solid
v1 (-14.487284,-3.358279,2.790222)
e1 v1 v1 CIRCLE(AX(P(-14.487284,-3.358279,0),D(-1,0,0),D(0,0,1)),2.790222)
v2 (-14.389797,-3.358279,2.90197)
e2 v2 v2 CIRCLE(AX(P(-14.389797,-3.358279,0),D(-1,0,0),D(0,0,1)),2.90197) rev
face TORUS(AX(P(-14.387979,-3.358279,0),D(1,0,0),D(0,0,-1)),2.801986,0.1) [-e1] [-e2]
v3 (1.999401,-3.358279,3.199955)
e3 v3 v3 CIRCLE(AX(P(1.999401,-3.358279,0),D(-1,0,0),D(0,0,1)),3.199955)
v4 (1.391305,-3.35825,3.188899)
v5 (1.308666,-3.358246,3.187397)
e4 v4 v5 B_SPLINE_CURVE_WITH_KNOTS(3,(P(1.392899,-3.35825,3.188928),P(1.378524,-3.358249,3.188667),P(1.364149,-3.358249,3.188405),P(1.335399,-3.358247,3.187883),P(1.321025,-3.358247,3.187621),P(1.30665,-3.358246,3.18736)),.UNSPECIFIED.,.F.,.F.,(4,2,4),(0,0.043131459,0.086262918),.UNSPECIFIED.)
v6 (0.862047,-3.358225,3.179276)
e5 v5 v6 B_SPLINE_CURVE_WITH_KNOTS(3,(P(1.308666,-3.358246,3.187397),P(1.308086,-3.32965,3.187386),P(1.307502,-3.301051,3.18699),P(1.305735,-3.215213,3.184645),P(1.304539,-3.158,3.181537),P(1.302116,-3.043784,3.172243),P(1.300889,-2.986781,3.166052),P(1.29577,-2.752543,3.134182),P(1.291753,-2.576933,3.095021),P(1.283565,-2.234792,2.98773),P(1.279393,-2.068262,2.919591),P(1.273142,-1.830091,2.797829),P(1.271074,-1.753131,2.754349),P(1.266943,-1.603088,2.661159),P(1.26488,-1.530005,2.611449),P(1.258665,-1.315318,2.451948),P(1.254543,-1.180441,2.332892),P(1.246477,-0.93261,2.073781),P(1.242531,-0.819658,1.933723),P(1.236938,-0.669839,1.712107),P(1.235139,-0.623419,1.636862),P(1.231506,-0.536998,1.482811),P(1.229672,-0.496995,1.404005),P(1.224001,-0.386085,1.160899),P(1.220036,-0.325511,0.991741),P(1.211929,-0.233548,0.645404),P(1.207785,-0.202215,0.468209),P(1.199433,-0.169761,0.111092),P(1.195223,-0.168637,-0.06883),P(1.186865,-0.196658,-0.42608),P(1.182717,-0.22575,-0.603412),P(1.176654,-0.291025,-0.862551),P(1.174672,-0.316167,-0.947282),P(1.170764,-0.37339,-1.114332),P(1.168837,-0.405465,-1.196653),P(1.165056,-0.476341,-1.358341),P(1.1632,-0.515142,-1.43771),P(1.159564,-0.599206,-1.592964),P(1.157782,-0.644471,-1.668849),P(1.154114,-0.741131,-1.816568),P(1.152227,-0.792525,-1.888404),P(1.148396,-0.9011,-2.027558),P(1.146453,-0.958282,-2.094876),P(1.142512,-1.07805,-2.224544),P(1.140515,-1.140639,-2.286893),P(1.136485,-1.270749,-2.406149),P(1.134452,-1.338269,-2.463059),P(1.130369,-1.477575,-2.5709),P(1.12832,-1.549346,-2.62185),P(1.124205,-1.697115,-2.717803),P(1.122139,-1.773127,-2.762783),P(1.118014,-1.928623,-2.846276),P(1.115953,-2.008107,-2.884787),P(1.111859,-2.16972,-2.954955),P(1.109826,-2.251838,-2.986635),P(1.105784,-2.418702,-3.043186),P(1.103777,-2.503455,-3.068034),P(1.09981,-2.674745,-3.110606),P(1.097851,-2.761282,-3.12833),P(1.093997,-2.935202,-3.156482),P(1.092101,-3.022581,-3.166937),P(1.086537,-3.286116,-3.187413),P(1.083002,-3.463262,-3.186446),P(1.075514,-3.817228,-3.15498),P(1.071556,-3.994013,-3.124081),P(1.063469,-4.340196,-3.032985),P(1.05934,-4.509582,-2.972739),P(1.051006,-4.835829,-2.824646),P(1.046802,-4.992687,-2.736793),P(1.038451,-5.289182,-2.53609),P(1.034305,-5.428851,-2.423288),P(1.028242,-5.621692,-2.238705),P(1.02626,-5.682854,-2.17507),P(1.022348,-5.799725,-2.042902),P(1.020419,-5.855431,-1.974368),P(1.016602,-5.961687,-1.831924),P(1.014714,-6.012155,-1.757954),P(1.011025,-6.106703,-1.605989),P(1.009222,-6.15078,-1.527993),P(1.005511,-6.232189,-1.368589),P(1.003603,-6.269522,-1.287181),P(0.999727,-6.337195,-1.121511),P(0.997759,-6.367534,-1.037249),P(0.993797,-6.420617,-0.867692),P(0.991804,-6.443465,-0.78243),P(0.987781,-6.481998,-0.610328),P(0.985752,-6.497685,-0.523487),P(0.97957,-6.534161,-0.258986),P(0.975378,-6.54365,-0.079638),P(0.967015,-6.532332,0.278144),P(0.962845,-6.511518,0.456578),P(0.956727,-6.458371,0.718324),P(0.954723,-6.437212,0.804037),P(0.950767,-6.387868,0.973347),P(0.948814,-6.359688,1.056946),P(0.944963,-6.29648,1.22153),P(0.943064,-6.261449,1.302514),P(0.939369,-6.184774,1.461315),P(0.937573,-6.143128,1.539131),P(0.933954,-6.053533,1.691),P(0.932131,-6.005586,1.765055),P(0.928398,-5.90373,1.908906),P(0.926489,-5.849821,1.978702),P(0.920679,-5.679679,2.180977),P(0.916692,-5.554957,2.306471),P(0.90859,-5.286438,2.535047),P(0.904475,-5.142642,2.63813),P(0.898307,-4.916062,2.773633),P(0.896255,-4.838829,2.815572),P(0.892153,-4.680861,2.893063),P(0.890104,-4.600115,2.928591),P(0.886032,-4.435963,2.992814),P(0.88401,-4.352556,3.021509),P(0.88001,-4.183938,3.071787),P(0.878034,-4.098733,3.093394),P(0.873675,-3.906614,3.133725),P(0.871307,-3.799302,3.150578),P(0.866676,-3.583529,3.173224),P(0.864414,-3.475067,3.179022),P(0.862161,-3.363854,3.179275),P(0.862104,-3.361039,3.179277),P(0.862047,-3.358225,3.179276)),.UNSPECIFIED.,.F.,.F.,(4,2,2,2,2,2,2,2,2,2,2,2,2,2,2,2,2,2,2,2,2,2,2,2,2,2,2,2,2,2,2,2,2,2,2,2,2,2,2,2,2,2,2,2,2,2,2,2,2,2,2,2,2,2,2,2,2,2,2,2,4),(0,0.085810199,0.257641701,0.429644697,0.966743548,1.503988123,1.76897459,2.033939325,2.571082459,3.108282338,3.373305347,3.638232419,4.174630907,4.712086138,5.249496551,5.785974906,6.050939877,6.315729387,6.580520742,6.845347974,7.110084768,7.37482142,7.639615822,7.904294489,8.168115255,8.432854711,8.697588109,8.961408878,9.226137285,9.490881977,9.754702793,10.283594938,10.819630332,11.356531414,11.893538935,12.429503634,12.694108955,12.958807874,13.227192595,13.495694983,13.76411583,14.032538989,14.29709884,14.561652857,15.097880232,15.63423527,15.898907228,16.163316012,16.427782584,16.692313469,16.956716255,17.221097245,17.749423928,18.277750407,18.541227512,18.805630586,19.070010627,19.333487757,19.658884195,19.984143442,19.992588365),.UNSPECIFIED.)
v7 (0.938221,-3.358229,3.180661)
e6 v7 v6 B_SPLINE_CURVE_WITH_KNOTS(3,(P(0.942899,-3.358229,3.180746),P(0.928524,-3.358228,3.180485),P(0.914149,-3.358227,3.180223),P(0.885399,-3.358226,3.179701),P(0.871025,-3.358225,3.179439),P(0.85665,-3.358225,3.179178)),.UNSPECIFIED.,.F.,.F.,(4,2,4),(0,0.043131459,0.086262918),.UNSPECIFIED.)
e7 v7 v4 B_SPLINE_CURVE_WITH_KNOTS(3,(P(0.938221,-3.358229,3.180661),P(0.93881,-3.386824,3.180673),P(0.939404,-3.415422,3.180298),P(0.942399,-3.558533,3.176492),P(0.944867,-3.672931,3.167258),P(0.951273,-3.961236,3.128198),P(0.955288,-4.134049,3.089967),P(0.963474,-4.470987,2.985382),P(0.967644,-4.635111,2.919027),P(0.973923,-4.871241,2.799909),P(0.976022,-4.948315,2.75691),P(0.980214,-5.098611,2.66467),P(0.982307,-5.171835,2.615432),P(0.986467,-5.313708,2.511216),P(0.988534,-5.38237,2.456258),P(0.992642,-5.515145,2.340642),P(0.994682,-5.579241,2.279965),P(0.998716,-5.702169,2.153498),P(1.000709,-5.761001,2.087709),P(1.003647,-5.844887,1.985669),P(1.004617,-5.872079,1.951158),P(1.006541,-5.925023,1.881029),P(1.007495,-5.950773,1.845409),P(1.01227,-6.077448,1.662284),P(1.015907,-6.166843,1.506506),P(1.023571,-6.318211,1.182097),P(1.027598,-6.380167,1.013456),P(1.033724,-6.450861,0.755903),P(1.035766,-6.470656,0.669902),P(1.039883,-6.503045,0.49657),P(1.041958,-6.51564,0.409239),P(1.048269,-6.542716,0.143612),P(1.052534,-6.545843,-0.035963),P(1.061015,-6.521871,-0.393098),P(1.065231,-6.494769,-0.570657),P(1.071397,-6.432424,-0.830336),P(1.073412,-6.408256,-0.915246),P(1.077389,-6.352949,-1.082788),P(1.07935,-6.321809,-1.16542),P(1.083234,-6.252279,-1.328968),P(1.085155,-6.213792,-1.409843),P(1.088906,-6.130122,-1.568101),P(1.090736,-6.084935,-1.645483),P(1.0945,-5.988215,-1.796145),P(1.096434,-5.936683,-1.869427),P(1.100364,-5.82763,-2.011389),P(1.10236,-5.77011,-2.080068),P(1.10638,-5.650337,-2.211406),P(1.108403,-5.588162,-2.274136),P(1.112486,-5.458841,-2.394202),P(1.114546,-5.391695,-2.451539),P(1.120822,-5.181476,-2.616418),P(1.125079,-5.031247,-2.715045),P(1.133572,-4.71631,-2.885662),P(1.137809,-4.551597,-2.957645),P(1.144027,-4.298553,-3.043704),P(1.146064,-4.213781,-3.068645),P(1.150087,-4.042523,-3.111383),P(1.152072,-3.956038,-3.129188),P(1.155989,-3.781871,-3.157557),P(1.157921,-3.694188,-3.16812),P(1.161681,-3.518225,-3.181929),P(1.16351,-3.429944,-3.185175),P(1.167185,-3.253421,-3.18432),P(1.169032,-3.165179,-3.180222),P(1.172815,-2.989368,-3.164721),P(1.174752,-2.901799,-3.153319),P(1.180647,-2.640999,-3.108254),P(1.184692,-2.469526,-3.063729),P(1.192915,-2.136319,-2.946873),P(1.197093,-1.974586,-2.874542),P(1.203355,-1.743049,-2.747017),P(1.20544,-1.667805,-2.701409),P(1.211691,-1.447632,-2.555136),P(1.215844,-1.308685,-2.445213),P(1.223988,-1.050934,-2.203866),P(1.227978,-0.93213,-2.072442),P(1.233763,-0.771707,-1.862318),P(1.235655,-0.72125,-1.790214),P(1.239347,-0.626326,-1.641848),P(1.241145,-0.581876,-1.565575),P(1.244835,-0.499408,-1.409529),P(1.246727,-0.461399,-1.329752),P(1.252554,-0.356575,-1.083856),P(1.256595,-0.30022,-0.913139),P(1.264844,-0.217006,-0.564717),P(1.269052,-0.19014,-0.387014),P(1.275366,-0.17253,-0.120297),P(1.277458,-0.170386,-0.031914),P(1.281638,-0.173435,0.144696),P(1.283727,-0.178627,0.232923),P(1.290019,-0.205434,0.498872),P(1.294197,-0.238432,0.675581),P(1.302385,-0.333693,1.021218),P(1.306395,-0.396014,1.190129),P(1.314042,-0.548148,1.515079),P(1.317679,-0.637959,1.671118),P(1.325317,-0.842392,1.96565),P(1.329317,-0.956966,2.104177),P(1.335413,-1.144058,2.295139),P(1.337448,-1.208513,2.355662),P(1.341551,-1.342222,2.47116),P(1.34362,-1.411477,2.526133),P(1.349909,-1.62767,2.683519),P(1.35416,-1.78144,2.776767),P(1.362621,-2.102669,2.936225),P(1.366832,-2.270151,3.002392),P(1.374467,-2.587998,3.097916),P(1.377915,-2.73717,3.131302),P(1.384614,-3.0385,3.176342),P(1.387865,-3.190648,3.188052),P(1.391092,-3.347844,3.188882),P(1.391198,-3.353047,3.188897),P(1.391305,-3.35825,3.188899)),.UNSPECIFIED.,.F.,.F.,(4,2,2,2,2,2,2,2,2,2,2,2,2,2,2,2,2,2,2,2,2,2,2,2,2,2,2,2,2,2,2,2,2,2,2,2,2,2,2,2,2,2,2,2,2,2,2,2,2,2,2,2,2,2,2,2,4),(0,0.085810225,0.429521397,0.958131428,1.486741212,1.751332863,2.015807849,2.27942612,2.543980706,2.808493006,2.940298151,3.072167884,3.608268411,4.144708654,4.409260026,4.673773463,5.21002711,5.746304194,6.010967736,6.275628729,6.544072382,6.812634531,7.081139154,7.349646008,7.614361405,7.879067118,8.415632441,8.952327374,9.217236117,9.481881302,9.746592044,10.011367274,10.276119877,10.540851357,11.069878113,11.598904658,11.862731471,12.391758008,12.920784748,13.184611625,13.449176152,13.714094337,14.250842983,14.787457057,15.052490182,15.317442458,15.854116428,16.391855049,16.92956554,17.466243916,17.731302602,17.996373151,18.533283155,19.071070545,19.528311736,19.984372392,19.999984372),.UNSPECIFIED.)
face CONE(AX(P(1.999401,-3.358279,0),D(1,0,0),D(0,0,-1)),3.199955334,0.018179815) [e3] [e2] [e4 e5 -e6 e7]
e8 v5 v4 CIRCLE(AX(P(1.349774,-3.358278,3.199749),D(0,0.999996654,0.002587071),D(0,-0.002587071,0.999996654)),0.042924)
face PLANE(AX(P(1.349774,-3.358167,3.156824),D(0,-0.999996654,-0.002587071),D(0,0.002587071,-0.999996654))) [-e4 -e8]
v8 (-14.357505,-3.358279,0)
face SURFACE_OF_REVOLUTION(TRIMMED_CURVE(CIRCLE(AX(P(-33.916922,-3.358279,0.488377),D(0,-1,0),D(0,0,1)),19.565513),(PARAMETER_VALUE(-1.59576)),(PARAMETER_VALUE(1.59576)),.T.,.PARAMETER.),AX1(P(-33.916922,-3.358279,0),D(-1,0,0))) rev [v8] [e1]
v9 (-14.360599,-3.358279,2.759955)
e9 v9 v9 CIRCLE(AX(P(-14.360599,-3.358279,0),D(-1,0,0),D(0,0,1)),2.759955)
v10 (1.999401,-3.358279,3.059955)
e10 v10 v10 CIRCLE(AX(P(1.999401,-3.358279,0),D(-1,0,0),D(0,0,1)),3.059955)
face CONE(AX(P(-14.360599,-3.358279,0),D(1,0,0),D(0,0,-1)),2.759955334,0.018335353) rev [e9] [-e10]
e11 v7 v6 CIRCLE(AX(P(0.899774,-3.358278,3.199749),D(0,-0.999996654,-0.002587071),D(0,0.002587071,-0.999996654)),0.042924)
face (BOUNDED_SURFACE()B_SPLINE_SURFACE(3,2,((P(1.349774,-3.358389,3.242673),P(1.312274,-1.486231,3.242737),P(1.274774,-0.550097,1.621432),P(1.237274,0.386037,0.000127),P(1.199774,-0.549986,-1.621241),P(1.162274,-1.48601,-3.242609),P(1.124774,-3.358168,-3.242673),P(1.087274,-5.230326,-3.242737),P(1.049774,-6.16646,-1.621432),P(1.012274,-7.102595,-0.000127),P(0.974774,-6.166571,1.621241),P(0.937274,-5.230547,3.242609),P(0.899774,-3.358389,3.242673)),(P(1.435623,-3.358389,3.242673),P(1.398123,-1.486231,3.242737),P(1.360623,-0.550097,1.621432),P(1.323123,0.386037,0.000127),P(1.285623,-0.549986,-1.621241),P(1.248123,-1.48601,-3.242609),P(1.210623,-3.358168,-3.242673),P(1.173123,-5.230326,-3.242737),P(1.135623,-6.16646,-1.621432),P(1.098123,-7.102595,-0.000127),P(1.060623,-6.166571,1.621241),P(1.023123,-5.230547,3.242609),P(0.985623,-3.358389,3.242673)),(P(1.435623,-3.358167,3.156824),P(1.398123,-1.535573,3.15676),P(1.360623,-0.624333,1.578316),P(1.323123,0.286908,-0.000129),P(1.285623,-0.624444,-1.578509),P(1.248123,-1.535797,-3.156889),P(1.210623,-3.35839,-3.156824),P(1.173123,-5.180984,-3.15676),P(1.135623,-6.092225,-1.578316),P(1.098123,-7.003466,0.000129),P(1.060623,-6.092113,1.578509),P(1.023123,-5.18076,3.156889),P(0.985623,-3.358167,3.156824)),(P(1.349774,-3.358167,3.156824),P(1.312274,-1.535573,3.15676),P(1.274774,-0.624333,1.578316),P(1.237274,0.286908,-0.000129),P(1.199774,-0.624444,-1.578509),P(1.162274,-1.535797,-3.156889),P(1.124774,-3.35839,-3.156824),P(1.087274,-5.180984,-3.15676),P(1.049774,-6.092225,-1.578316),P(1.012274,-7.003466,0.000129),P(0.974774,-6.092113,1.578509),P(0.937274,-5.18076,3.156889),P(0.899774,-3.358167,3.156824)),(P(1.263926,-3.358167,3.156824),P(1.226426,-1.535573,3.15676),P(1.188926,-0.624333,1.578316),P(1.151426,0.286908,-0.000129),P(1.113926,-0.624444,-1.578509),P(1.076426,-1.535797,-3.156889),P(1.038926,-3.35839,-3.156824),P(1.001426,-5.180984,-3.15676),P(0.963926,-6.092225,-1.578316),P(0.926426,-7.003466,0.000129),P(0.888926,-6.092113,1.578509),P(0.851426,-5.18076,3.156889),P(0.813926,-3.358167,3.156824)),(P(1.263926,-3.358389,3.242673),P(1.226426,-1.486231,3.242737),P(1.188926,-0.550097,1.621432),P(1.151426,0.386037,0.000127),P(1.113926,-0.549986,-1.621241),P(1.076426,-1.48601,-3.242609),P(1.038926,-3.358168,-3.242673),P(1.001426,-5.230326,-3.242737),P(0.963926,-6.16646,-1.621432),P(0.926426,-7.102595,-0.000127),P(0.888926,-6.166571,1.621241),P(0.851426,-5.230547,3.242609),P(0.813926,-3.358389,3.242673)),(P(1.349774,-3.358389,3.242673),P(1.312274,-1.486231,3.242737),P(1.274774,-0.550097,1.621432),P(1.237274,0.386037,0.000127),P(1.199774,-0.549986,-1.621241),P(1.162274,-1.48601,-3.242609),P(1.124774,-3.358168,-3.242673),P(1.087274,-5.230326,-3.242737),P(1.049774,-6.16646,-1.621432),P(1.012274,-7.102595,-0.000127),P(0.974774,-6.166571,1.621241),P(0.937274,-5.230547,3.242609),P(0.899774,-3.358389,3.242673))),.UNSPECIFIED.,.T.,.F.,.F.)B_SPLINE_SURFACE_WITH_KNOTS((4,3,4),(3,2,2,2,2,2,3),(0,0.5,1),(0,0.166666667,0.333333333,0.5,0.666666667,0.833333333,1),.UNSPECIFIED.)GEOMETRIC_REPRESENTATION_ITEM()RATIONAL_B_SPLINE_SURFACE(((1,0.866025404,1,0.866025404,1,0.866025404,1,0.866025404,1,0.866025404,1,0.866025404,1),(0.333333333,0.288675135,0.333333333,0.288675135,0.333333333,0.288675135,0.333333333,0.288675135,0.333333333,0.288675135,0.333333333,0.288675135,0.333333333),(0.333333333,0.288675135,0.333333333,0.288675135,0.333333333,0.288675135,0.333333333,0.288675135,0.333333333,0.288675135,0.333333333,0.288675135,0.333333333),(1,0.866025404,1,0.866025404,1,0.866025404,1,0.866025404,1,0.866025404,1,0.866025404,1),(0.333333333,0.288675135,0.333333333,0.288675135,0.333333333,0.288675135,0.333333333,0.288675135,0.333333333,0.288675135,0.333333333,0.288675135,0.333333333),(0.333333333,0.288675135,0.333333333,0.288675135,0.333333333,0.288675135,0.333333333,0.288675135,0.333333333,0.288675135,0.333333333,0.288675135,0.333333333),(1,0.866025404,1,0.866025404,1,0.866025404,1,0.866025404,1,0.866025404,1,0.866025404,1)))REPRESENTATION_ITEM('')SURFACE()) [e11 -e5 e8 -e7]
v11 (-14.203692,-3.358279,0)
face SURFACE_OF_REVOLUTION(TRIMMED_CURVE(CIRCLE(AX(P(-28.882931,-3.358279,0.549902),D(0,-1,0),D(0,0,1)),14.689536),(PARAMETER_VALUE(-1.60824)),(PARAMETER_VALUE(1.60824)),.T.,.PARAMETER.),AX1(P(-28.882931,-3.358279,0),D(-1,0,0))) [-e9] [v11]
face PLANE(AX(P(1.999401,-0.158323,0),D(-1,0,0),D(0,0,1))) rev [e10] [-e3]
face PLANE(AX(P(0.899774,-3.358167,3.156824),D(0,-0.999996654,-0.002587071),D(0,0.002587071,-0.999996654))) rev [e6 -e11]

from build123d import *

# Parameters (mm, degrees)
SWEEP_1_PITCH = 0.45
FILLET_3_R    = 0.1


with BuildPart() as part:
    # 草图1 → 旋转3 (revolve)
    with BuildSketch(Plane.XY, mode=Mode.PRIVATE) as revolve_3_sk:
        with BuildLine():
            Line((-14.500599108, -0.458323283), (1.999400892, -0.158323283))
            Line((1.999400892, -0.158323283), (1.999400892, -0.298323283))
            Line((1.999400892, -0.298323283), (-14.360599108, -0.598323283))
            ThreePointArc((-14.360599108, -0.598323283), (-14.217076798, -1.974601707), (-14.203691623, -3.358278617))
            Line((-14.203691623, -3.358278617), (-14.357505029, -3.358278617))
            ThreePointArc((-14.357505029, -3.358278617), (-14.375184367, -1.905642927), (-14.500599108, -0.458323283))
        make_face()
    revolve(revolve_3_sk.sketch.rotate(Axis((-14.483691623, -3.358278617, 0), (1, 0, 0)), 90), axis=Axis((-14.483691623, -3.358278617, 0), (1, 0, 0)))

    # 扫描1: arcs per turn and ends read off the stored shape
    # 扫描1: the profile of 草图9 screwed along a right-hand helix through 1 turns, 6 arcs to a turn; built about Z, then put on its axis
    sweep_1_z = Axis((0, 0, 0), (0, 0, 1))
    sweep_1_corners = [(3.199748648, 5.52e-07, 0.407301454), (3.15682446, 0.000111601, 0.450225786), (3.199748648, 5.52e-07, 0.493150117), (3.242672835, -0.000110498, 0.450225786)]
    with BuildLine(mode=Mode.PRIVATE) as sweep_1_profile:
        ThreePointArc((3.199748648, 5.52e-07, 0.407301454), (3.169396663, 7.9075e-05, 0.4198737), (3.15682446, 0.000111601, 0.450225786))
        ThreePointArc((3.15682446, 0.000111601, 0.450225786), (3.169396663, 7.9075e-05, 0.480577871), (3.199748648, 5.52e-07, 0.493150117))
        ThreePointArc((3.199748648, 5.52e-07, 0.493150117), (3.230100632, -7.7972e-05, 0.480577871), (3.242672835, -0.000110498, 0.450225786))
        ThreePointArc((3.242672835, -0.000110498, 0.450225786), (3.230100632, -7.7972e-05, 0.4198737), (3.199748648, 5.52e-07, 0.407301454))
    sweep_1_cap = Face(sweep_1_profile.wire())
    sweep_1_arcs = [((3.199748648, 5.52e-07, 0.407301454), (3.15682446, 0.000111601, 0.407301454), (3.15682446, 0.000111601, 0.450225786), (1, 0.7071067811865475, 1)), ((3.15682446, 0.000111601, 0.450225786), (3.15682446, 0.000111601, 0.493150117), (3.199748648, 5.52e-07, 0.493150117), (1, 0.7071067811865475, 1)), ((3.199748648, 5.52e-07, 0.493150117), (3.242672835, -0.000110498, 0.493150117), (3.242672835, -0.000110498, 0.450225786), (1, 0.7071067811865475, 1)), ((3.242672835, -0.000110498, 0.450225786), (3.242672835, -0.000110498, 0.407301454), (3.199748648, 5.52e-07, 0.407301454), (1, 0.7071067811865475, 1))]  # start, shoulder, end, weights
    sweep_1_turn_angles = [0, 30, 60, 90, 120, 150, 180, 210, 240, 270, 300, 330, 360]
    sweep_1_turn_weights = [1, 0.8660254037844387, 1, 0.8660254037844387, 1, 0.8660254037844387, 1, 0.8660254037844387, 1, 0.8660254037844387, 1, 0.8660254037844387, 1]
    sweep_1_turn_sides = [Face.make_bezier_surface([[Vector(p[j][0], p[j][1], 0).rotate(sweep_1_z, sweep_1_turn_angles[2 * i + k]) / sweep_1_turn_weights[2 * i + k] + Vector(0, 0, p[j][2] + SWEEP_1_PITCH * sweep_1_turn_angles[2 * i + k] / 360) for k in range(3)] for j in range(3)], [[p[3][j] * sweep_1_turn_weights[2 * i + k] for k in range(3)] for j in range(3)]) for p in sweep_1_arcs for i in range(6)]
    sweep_1 = Plane(origin=(1.8, -3.358278617, 0), x_dir=(0, 0, 1), z_dir=(-1, 0, 0)) * Solid(Shell([*sweep_1_turn_sides, sweep_1_cap, sweep_1_cap.rotate(sweep_1_z, 360).moved(Location((0, 0, SWEEP_1_PITCH * 360 / 360)))]))
    add(sweep_1)

    # 圆角3
    fillet_3_edges = [part.edges().sort_by_distance(p)[0] for p in [
        (-14.500599108, -3.358278617, -2.899955334),
    ]]
    fillet(fillet_3_edges, radius=FILLET_3_R)


solid = part.part
